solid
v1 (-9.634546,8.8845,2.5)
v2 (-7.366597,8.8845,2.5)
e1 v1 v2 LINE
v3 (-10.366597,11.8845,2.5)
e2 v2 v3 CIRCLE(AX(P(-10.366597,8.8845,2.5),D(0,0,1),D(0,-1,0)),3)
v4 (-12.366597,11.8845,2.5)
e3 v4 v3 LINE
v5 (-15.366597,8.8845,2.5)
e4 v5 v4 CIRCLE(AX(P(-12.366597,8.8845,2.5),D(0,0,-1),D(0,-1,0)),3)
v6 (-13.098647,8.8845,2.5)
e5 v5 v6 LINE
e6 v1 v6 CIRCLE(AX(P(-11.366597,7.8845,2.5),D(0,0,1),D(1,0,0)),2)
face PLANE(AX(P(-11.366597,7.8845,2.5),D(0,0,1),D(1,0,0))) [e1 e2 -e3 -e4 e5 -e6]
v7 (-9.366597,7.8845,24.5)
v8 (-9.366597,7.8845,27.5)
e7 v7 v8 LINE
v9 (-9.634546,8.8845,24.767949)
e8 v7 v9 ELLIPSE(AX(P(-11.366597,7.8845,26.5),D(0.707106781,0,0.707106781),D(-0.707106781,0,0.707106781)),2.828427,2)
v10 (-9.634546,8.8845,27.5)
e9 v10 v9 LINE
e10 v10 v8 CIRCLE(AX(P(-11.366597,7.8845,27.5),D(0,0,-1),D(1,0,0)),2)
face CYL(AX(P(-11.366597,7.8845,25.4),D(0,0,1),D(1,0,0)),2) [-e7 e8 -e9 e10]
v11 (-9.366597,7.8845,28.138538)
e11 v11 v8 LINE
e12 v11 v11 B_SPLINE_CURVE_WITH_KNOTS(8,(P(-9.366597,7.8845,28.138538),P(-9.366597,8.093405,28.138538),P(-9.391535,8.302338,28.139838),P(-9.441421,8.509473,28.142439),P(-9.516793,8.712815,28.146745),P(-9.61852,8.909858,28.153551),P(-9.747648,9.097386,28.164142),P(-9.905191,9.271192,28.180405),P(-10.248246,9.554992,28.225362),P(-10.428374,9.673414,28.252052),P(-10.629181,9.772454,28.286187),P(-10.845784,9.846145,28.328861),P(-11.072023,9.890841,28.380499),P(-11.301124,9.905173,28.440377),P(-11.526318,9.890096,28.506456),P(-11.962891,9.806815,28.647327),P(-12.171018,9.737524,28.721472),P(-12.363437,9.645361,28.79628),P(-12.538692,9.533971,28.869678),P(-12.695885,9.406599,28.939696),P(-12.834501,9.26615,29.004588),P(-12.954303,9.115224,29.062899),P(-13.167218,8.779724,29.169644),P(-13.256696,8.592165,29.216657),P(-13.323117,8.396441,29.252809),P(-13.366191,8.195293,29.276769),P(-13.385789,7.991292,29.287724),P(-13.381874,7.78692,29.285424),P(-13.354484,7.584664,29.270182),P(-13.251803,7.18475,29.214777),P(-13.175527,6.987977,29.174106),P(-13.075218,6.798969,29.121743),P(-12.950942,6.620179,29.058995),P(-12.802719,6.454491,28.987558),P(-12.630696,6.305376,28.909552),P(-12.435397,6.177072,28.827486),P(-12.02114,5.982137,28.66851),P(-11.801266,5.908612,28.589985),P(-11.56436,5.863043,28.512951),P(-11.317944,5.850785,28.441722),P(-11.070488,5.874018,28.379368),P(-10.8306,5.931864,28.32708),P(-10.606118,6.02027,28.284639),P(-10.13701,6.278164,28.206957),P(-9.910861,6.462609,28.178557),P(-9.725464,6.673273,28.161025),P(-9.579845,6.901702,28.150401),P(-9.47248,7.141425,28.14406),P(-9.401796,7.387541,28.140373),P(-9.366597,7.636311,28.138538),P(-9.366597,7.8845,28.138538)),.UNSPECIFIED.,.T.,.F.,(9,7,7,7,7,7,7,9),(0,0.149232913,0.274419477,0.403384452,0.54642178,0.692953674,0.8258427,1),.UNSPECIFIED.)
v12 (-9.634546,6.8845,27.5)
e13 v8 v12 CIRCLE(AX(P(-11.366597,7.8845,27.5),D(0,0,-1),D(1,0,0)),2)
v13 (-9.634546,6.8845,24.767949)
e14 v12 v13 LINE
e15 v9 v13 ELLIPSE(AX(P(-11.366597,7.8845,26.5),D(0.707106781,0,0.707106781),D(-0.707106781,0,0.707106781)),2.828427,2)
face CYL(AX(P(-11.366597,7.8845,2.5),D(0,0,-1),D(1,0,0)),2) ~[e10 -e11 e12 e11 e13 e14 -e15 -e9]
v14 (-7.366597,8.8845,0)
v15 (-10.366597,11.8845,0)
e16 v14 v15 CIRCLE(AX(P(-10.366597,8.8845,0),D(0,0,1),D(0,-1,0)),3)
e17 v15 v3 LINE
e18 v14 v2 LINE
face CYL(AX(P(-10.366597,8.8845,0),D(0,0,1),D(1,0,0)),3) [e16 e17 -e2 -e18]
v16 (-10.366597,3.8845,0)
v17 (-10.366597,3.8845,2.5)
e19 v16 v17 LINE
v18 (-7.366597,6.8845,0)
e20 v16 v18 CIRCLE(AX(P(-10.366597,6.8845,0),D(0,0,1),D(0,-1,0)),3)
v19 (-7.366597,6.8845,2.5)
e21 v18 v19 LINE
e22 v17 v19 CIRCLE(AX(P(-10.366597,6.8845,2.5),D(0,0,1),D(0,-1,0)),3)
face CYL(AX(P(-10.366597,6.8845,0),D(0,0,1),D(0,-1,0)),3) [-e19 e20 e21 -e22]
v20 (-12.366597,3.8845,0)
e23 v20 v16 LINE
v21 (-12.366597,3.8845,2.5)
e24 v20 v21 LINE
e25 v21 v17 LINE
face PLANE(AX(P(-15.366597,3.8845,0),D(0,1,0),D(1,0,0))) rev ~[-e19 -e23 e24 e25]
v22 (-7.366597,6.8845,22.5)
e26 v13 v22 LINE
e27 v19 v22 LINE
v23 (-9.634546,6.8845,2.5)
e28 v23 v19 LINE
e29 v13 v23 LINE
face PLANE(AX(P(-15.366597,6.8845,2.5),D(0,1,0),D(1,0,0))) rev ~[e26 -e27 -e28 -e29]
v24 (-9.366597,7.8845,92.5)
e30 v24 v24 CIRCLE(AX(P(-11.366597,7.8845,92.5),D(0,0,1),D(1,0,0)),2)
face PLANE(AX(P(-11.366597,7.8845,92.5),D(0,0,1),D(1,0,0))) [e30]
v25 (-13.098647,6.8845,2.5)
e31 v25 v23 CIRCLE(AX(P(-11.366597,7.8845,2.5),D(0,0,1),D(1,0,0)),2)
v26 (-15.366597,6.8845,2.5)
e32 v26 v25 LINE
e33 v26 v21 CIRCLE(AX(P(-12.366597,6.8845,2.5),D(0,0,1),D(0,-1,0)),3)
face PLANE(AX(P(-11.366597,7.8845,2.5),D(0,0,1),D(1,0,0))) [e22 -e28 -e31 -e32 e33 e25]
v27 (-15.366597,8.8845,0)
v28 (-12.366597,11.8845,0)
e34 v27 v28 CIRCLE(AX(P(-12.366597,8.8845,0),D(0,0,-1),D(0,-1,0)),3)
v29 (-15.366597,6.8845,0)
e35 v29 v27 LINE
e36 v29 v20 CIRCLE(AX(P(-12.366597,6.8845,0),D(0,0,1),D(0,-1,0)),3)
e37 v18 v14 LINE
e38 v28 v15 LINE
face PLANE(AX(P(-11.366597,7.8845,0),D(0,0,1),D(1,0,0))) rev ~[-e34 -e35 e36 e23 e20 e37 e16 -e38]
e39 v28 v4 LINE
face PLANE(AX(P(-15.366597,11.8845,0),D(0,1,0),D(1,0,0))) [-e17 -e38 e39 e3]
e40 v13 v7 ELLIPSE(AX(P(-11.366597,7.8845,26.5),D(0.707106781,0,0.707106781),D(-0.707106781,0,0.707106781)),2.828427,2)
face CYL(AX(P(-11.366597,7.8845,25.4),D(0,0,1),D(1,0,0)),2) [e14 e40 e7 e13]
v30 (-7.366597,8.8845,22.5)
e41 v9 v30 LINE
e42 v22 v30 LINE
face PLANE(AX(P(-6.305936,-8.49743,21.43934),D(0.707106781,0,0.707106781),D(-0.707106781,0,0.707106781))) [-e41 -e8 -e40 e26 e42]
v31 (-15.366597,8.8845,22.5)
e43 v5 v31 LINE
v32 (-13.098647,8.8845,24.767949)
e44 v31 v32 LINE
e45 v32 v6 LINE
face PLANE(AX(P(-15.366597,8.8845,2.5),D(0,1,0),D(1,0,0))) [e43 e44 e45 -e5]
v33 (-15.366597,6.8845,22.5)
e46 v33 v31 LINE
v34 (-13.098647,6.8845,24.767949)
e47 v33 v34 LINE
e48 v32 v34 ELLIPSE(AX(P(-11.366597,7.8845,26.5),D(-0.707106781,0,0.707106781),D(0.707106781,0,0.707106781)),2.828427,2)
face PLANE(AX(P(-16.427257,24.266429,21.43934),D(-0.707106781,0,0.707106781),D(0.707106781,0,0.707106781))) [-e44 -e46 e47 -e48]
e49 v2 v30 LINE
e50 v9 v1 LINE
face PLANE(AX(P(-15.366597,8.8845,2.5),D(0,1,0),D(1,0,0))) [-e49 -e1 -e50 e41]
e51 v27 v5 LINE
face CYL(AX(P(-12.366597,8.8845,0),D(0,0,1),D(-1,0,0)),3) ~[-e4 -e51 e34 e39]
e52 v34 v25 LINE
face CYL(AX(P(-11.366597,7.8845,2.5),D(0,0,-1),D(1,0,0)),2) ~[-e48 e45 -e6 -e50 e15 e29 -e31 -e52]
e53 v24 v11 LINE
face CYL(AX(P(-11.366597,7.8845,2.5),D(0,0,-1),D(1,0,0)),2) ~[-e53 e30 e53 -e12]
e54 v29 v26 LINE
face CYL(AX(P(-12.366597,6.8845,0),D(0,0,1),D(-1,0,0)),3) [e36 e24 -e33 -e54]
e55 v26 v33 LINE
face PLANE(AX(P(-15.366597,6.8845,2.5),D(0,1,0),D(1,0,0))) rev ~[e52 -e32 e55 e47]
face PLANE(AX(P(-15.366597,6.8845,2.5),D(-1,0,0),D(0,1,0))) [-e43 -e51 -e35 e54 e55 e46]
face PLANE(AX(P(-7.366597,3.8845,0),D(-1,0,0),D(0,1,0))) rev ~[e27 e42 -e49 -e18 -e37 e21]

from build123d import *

# Parameters (mm, degrees)
F0_W         = 8
F0_H         = 8
F1_DEPTH     = 2.5
F2_R         = 3
F3_R         = 2
F4_DEPTH     = 90
F5_W         = 8
F5_H         = 2
F6_DEPTH     = 25
F7_T4_DEPTH  = 32.7638593636
F7_S5_R      = 2
F7_T6_DEPTH  = 19
F7_T10_DEPTH = 32.7638593636
F7_S11_R     = 2
F7_T12_DEPTH = 19


# Not quite as in the source:
# - a fillet or chamfer that OpenCascade refuses, or shapes differently, is made with other operations: its cross-section is extruded or revolved along the edge and cut away or added


with BuildPart() as f1:
    # F0 (on Top) → F1 (new body)
    with BuildSketch(Plane.XY):
        with Locations((-11.3665966003, 7.8844996169)):
            Rectangle(F0_W, F0_H)
    extrude(amount=F1_DEPTH)

    # F2
    f2_edges = [f1.edges().sort_by_distance(p)[0] for p in [
        (-15.366597, 3.8845, 1.25),
        (-15.366597, 11.8845, 1.25),
        (-7.366597, 3.8845, 1.25),
        (-7.366597, 11.8845, 1.25),
    ]]
    fillet(f2_edges, radius=F2_R)

    # F3 (on face) → F4 (join)
    with BuildSketch(Plane.XY.offset(2.5)):
        with Locations((-11.3665966003, 7.8844996169)):
            Circle(F3_R)
    extrude(amount=F4_DEPTH)

    # F5 (on face) → F6 (join)
    with BuildSketch(Plane.XY.offset(2.5)):
        with Locations((-11.3665966003, 7.8844996169)):
            Rectangle(F5_W, F5_H)
    extrude(amount=F6_DEPTH)

    # F7: chamfer of 5 on 2 edges, made by hand


with BuildPart() as f7_tool2:
    # F7_s3 → F7_t4 (new body)
    with BuildSketch(Plane.XZ.offset(-24.2664292987)):
        with BuildLine():
            Line((-16.427256772, 21.4393398282), (-9.3059364285, 28.5606601718))
            Line((-9.3059364285, 28.5606601718), (-9.3059364285, 29.3106601718))
            ThreePointArc((-9.3059364285, 29.3106601718), (-12.3362665144, 28.25), (-15.3665966003, 28.25))
            Line((-15.3665966003, 28.25), (-16.1165966003, 27.5))
            ThreePointArc((-16.1165966003, 27.5), (-16.1165966003, 24.4696699141), (-17.177256772, 21.4393398282))
            Line((-17.177256772, 21.4393398282), (-16.427256772, 21.4393398282))
        make_face()
    extrude(amount=F7_T4_DEPTH)

    # F7_s5 → F7_t6 (cut, symmetric)
    with BuildSketch(Plane.XY.offset(25.4)):
        with Locations((-11.3665966003, 7.8844996169)):
            Circle(F7_S5_R)
    extrude(amount=F7_T6_DEPTH, both=True, mode=Mode.SUBTRACT)


with BuildPart() as f1_1:
    add(f1.part)

    # F7_t1: cut F7_tool2
    add(f7_tool2.part, mode=Mode.SUBTRACT)


with BuildPart() as f7_tool8:
    # F7_s9 → F7_t10 (new body)
    with BuildSketch(Plane.XZ.offset(8.4974300649)):
        with BuildLine():
            Line((-6.3059364285, 21.4393398282), (-13.427256772, 28.5606601718))
            Line((-13.427256772, 28.5606601718), (-13.427256772, 29.3106601718))
            ThreePointArc((-13.427256772, 29.3106601718), (-10.3969266861, 28.25), (-7.3665966003, 28.25))
            Line((-7.3665966003, 28.25), (-6.6165966003, 27.5))
            ThreePointArc((-6.6165966003, 27.5), (-6.6165966003, 24.4696699141), (-5.5559364285, 21.4393398282))
            Line((-5.5559364285, 21.4393398282), (-6.3059364285, 21.4393398282))
        make_face()
    extrude(amount=-F7_T10_DEPTH)

    # F7_s11 → F7_t12 (cut, symmetric)
    with BuildSketch(Plane.XY.offset(25.4)):
        with Locations((-11.3665966003, 7.8844996169)):
            Circle(F7_S11_R)
    extrude(amount=F7_T12_DEPTH, both=True, mode=Mode.SUBTRACT)


with BuildPart() as f1_2:
    add(f1_1.part)

    # F7_t7: cut F7_tool8
    add(f7_tool8.part, mode=Mode.SUBTRACT)


solid = f1_2.part
